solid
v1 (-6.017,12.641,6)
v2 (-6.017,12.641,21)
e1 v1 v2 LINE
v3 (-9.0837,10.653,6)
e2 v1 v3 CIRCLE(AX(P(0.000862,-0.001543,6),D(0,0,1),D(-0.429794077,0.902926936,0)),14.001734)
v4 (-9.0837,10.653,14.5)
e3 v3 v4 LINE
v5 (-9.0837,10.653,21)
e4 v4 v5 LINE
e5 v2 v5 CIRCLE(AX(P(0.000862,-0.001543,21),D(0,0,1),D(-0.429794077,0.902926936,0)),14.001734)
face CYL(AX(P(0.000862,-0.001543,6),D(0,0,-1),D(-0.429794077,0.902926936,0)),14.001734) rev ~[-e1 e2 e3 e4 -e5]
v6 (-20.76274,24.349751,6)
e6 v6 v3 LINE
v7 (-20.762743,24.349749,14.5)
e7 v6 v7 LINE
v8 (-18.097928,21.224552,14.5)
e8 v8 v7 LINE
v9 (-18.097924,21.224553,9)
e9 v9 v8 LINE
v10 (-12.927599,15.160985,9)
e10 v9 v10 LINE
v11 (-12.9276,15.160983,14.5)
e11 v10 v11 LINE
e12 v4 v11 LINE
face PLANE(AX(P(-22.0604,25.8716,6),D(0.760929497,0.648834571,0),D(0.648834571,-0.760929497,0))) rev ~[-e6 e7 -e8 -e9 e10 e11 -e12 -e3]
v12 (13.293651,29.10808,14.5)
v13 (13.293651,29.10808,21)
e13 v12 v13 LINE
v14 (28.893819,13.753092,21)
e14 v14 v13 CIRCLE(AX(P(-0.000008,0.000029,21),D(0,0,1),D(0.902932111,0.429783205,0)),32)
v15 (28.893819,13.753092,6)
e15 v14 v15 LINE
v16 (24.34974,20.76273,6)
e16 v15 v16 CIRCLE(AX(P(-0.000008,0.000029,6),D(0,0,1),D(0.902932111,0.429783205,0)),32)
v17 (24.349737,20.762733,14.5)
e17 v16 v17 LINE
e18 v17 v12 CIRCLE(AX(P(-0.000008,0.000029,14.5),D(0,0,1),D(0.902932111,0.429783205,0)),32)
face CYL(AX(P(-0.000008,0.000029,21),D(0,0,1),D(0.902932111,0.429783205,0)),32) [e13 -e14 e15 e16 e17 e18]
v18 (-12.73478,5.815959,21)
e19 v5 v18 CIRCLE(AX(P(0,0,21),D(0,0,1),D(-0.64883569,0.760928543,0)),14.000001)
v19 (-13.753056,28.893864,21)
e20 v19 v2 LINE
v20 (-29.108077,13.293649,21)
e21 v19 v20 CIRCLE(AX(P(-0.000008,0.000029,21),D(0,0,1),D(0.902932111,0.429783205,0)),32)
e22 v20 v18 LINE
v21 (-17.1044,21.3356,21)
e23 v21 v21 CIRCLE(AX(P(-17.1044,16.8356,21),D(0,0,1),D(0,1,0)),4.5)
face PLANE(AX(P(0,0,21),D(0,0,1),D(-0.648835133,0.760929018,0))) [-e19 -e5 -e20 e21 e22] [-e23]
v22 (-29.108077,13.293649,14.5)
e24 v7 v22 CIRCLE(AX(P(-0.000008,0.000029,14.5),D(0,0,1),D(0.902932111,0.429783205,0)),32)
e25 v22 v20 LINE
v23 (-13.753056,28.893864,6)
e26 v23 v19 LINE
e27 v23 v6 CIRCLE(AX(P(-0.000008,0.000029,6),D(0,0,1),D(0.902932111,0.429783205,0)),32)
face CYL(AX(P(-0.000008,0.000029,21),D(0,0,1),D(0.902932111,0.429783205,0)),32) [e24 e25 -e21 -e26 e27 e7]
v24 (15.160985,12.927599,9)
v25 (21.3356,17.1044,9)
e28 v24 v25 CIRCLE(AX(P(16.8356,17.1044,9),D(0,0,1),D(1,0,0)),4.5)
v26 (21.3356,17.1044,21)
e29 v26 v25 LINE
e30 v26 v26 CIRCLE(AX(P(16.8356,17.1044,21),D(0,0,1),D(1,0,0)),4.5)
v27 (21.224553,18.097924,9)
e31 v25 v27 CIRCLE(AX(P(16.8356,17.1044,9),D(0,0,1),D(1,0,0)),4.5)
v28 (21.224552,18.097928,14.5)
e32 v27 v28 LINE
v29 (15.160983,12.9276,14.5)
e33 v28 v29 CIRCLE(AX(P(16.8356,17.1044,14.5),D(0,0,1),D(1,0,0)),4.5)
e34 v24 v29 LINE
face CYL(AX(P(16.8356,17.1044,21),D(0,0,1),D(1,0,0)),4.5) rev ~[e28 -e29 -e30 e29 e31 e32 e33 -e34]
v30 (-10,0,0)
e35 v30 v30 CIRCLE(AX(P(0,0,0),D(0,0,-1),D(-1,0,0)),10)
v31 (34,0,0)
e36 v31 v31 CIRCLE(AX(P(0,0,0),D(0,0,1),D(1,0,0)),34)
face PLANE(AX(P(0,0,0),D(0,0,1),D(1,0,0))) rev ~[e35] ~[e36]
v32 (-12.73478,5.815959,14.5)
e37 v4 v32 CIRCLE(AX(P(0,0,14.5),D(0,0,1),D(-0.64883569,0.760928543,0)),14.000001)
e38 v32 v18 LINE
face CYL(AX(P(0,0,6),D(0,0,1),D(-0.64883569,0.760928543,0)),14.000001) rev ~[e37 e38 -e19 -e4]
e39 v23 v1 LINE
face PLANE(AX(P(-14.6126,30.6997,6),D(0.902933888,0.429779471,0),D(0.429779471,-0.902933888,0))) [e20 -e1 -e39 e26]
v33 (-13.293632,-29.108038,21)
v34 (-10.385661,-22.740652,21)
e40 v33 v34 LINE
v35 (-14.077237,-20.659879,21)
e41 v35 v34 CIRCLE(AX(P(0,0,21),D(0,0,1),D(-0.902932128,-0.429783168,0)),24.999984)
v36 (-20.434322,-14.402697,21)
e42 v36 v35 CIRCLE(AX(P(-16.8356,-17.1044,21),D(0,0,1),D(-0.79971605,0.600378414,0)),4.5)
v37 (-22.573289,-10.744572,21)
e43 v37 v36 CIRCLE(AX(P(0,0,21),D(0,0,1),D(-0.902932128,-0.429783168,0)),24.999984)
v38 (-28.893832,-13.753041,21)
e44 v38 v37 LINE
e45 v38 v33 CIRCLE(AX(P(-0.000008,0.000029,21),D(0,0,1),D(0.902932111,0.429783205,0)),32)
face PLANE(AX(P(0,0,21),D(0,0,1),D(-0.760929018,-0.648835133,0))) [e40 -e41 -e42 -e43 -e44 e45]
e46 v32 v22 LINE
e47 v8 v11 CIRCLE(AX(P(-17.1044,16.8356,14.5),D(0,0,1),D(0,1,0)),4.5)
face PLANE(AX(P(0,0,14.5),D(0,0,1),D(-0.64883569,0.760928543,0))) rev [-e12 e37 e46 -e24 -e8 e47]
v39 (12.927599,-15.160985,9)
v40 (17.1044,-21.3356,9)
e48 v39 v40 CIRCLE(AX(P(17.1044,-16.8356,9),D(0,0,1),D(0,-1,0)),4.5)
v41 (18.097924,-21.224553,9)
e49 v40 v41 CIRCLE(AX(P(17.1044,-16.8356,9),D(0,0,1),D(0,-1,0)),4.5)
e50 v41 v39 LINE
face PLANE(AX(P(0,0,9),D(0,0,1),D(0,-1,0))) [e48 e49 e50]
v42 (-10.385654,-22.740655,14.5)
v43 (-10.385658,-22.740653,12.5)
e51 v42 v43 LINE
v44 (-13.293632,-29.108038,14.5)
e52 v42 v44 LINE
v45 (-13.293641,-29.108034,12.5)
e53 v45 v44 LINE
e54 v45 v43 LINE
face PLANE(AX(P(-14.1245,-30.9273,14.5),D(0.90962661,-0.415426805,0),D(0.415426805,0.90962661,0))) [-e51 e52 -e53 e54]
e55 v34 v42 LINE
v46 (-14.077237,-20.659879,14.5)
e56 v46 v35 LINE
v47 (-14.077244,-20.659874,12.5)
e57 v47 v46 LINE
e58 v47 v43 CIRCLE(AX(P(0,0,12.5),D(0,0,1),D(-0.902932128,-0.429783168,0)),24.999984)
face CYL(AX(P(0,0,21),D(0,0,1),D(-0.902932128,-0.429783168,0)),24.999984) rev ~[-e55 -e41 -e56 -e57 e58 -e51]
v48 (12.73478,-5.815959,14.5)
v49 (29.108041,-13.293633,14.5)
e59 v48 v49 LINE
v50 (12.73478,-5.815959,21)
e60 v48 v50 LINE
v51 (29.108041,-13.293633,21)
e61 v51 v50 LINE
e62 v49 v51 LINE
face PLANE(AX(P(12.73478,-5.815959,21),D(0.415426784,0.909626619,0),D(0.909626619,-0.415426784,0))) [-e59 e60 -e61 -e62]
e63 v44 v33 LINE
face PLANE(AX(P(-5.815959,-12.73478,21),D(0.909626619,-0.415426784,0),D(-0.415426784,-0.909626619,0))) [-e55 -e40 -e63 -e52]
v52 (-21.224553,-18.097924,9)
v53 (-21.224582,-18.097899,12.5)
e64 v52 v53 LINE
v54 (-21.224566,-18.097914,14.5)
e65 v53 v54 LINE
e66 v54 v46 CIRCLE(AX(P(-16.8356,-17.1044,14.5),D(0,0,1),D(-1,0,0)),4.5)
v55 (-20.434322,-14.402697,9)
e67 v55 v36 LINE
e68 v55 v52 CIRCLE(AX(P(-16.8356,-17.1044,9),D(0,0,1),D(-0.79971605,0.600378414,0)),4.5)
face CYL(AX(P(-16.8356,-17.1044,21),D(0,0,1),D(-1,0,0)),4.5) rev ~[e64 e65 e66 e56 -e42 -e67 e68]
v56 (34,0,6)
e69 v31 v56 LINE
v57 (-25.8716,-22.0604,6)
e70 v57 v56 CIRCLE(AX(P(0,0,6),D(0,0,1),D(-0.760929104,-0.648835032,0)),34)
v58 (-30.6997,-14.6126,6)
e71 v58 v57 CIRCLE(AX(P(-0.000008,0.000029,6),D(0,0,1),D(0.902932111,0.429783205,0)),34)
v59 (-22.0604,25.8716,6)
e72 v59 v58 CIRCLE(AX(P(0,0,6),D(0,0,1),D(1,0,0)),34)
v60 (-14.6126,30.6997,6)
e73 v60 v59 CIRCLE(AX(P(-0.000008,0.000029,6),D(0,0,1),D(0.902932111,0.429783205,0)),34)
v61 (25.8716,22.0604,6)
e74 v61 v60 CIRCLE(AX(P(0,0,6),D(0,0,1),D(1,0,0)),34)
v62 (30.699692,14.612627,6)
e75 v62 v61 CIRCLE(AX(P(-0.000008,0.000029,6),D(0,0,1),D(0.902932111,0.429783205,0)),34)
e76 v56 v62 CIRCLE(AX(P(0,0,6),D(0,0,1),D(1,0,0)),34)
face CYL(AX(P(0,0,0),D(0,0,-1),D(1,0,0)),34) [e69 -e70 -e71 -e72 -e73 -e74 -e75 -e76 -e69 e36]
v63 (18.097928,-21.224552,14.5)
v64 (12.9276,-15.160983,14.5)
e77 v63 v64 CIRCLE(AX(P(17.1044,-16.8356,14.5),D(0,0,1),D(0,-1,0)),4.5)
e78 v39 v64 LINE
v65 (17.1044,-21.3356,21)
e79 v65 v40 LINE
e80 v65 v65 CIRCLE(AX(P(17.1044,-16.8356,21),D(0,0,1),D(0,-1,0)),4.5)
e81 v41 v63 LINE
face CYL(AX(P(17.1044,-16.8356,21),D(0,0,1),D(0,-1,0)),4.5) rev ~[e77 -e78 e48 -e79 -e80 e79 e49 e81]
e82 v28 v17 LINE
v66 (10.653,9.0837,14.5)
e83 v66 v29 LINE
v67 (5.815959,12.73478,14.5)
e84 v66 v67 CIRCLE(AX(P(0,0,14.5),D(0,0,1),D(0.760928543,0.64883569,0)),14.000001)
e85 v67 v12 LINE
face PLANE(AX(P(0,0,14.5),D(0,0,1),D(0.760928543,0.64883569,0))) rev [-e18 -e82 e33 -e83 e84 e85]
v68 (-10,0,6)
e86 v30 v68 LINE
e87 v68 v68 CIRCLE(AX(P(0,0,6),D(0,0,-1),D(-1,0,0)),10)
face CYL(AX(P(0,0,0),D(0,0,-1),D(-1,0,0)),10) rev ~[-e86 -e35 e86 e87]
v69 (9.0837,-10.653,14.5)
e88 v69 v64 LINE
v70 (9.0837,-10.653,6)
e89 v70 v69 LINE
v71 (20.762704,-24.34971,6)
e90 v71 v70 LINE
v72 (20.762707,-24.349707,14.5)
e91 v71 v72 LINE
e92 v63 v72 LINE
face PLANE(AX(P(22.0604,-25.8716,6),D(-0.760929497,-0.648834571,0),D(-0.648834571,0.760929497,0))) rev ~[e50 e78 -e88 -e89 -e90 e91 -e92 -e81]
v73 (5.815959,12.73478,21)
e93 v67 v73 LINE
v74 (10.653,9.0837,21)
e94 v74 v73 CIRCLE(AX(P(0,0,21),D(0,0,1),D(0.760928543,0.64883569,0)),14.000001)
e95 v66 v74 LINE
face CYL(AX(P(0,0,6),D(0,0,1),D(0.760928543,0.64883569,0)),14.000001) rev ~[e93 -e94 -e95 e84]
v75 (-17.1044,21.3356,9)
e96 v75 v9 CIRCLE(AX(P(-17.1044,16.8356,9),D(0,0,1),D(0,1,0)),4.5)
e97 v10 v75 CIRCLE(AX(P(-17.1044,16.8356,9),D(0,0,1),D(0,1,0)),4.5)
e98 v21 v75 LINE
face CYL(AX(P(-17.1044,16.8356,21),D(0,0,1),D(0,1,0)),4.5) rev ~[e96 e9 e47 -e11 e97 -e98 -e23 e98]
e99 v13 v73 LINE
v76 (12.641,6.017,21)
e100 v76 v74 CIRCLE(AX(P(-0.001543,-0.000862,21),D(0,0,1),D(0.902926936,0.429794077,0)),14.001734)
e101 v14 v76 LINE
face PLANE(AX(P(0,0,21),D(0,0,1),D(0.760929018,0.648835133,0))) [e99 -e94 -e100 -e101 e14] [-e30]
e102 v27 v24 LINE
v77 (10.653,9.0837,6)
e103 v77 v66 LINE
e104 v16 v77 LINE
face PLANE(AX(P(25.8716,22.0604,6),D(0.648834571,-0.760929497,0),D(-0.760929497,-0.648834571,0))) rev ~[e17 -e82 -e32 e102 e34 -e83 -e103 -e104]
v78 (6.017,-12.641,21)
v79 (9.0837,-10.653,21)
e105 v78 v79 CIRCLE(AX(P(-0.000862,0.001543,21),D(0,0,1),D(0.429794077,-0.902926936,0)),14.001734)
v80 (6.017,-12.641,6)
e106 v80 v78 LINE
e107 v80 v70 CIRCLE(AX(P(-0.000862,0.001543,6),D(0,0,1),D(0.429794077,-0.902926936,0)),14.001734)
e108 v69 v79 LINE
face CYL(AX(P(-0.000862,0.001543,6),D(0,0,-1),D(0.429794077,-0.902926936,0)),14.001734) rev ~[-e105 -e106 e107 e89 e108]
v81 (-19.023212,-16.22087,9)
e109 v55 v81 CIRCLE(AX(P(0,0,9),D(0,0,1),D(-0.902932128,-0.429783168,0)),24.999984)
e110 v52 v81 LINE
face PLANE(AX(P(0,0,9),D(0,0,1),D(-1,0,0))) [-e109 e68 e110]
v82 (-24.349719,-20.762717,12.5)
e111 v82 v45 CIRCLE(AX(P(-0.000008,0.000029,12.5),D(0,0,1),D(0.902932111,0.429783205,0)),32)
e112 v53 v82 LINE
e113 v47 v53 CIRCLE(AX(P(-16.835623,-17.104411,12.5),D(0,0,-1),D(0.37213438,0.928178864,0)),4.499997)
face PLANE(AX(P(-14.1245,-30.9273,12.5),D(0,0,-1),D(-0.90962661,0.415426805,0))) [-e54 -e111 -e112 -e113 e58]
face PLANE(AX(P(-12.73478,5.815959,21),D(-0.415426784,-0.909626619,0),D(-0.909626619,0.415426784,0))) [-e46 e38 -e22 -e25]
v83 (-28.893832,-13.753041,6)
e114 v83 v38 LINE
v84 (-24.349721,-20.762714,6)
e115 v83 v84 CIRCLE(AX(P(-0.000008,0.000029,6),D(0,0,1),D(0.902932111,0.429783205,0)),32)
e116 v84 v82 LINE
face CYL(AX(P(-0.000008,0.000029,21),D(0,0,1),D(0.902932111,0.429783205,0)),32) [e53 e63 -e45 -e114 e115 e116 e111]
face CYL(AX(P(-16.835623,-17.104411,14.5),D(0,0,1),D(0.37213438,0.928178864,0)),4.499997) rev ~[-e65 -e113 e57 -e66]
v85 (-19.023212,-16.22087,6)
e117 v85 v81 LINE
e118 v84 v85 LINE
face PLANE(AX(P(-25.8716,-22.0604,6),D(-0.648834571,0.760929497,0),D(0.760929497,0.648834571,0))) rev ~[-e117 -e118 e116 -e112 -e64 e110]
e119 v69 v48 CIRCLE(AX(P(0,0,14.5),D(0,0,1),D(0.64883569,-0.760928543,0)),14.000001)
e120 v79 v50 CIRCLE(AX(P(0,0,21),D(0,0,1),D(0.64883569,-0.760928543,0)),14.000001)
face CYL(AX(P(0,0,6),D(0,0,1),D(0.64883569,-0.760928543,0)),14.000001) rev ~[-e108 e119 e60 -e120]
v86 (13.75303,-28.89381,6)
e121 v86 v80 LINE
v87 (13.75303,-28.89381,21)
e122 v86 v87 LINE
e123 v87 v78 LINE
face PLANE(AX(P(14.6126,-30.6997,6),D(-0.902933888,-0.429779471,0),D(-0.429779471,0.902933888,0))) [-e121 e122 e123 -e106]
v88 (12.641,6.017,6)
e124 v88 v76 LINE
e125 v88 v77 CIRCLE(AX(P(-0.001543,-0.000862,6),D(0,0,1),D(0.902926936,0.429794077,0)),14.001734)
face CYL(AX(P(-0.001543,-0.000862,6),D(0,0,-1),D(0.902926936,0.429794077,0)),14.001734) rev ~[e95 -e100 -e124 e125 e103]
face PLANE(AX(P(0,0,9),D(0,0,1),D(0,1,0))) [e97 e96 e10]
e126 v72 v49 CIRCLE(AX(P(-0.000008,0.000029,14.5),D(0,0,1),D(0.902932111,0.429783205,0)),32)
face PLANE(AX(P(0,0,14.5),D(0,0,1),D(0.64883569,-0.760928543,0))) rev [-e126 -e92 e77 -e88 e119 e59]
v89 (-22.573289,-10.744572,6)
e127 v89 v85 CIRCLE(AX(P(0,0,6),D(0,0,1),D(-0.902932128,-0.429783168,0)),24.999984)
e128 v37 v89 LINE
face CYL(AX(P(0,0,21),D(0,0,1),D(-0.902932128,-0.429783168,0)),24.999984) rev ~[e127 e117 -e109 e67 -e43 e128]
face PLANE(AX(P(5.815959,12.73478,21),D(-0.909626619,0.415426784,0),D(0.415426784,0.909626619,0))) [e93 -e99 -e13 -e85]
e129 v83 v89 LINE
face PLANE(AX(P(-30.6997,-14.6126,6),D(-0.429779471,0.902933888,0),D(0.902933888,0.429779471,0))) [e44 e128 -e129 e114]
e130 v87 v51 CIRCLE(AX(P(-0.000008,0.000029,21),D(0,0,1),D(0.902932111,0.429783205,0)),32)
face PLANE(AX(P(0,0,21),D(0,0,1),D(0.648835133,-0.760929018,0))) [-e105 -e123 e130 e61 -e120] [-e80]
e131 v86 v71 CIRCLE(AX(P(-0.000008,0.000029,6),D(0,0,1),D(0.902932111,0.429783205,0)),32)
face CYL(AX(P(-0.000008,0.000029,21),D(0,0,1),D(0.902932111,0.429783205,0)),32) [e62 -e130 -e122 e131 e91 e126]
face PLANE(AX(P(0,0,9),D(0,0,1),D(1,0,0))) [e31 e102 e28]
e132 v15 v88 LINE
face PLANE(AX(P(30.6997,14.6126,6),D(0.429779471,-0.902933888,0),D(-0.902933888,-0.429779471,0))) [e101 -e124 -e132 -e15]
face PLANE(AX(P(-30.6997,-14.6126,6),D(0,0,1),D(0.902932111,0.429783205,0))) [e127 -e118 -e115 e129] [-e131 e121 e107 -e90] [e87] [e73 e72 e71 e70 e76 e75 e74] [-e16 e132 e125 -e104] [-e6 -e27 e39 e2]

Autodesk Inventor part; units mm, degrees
ref_plane "YZ Plane" through (0, 0, 0) normal (1, 0, 0) x (0, 1, 0)
ref_plane "XZ Plane" through (0, 0, 0) normal (0, 1, 0) x (-1, 0, 0)
ref_plane "XY Plane" through (0, 0, 0) normal (0, 0, 1) x (1, 0, 0)
sketch "Sketch1" plane through (0, 0, 0) normal (0, 0, 1) x (1, 0, 0)
  circle A0 centre (0, 0) radius 34
  dimension "d0" = 68
extrude "Extrusion1" add sketch "Sketch1" along normal blind 6
sketch "Sketch2" plane through (0, 0, 6) normal (0, 0, 1) x (1, 0, 0)
  circle A0 centre (0, 0) radius 34
  circle A1 centre (0, 0) radius 34 projected
  line L0 (0, 0) -> (30.6997, 14.6126) construction
  line L1 (0, 0) -> (25.8716, 22.0604) construction
  line L2 (25.8716, 22.0604) -> (10.653, 9.0837)
  line L3 (30.6997, 14.6126) -> (12.641, 6.017)
  arc A2 (30.6997, 14.6126) -> (25.8716, 22.0604) centre (0, 0) ccw
  arc A3 (12.641, 6.017) -> (10.653, 9.0837) centre (0, 0) ccw
  dimension "d3" = 15
  dimension "d4" = 20
extrude "Extrusion2" add sketch "Sketch2" along normal blind 15 contours L3 A3 L2 A0 picked at (22.8031, 15.025)
sketch "Sketch3" plane through (10.653, 9.0837, 21) normal (-0.6488347, 0.7609293, 0) x (0.7609293, 0.6488347, 0)
  line L0 (0, 15) -> (0, 0) projected
  line L1 (20, 0) -> (0, 0)
  line L2 (0, 0) -> (0, 6.5)
  line L3 (0, 6.5) -> (20, 6.5)
  line L4 (20, 6.5) -> (20, 0)
  line L5 (-14, 25.2) -> (-14, -4.2) projected
  line L6 (-48, 15) -> (20, 15) projected
  point P0 (-14, 21)
  point P1 (18.8415, 15)
  dimension "d7" = 6.5
  dimension "d26" = 8.5
revolve "Revolution1" add sketch "Sketch3" angle 25 about axis through (0, 0, 6) along (0, 0, 1)
sketch "Sketch4" plane through (0, 0, 21) normal (0, 0, 1) x (1, 0, 0)
  circle A0 centre (16.8356, 17.1044) radius 4.5
  arc A1 (12.641, 6.017) -> (5.816, 12.7348) centre (0, 0) ccw projected
  arc A2 (30.6997, 14.6126) -> (14.1245, 30.9273) centre (0, 0) ccw projected
  line L0 (12.641, 6.017) -> (30.6997, 14.6126) projected
  line L1 (5.816, 12.7348) -> (14.1245, 30.9273) projected
  arc A3 (21.6704, 10.3148) -> (9.9702, 21.831) centre (0, 0) ccw construction
  circle A4 centre (0, 0) radius 34 construction
  line L2 (23.8505, 24.2313) -> (19.6046, 19.9177) construction
  dimension "d12" = 9
extrude "Extrusion3" cut sketch "Sketch4" against normal blind 12 contours A0
pattern_circular "Circular Pattern2" count 4 over 360 about axis through (0, 0, 6) along (0, 0, 1) of "Revolution1", "Extrusion3", "Extrusion2"
sketch "Sketch5" plane through (0, 0, 0) normal (0, 0, -1) x (-1, 0, 0)
  circle A0 centre (0, 0) radius 10
  dimension "d23" = 20
extrude "Extrusion4" cut sketch "Sketch5" against normal blind 10
sketch "Sketch6" plane through (-14.1245, -30.9273, 14.5) normal (0, 0, -1) x (-0.9096266, 0.4154268, 0)
  line L0 (11.7881, 8.7204) -> (14.369, 3.1855) projected
  line L1 (0, 0) -> (0, 20)
  arc A0 (0, 0) -> (14.369, 3.1855) centre (0, 34) ccw
  arc A1 (0, 20) -> (5.9167, 21.3117) centre (0, 34) ccw projected
  arc A2 (0, 20) -> (5.9167, 21.3117) centre (0, 34) ccw
  arc A3 (0, 0) -> (14.369, 3.1855) centre (0, 34) ccw projected
  arc A4 (8.4204, 15.9424) -> (11.7881, 8.7204) centre (8.2085, 11.4474) ccw
  arc A5 (8.4204, 15.9424) -> (11.7881, 8.7204) centre (8.2085, 11.4474) ccw projected
  line L2 (14.369, 3.1855) -> (11.7881, 8.7204)
  line L3 (8.4204, 15.9424) -> (5.9167, 21.3117)
  point P0 (0, 34)
extrude "Extrusion5" add sketch "Sketch6" along normal blind 2
sketch "Sketch7" plane through (0, 0, 21) normal (0, 0, 1) x (0.7126851, -0.7014841, 0)
  line L0 (11.6287, -31.9495) -> (9.1517, -25.1441)
  line L1 (4.7883, -13.1557) -> (11.6287, -31.9495) projected
  line L2 (12.9105, -23.776) -> (15.3067, -30.3596)
  arc A0 (11.6287, -31.9495) -> (15.3067, -30.3596) centre (0, 0) ccw
  line L3 (12.9105, -23.776) -> (9.1517, -25.1441)
  arc A1 (-11.6287, -31.9495) -> (11.6287, -31.9495) centre (0, 0) ccw projected
  dimension "d29" = 4
extrude "Extrusion6" [suppressed]
sketch "Sketch8" plane through (-30.6997, -14.6126, 21) normal (0, 0, 1) x (0.9029321, 0.4297832, 0)
  circle A0 centre (34, 0) radius 34 projected
  circle A1 centre (34, 0) radius 34
  circle A2 centre (34, 0) radius 10 projected
  circle A3 centre (34, 0) radius 32
  dimension "d32" = 2
extrude "Extrusion7" cut sketch "Sketch8" against normal up to surface (15 mm away) contours A0
sketch "Sketch9" plane through (0, 0, 21) normal (0, 0, 1) x (0.7126851, -0.7014841, 0)
  point P0 (0, 0)
sketch "Sketch10" plane through (0, 0, 21) normal (0, 0, 1) x (0.7126851, -0.7014841, 0)
  line L0 (4.7883, -13.1557) -> (10.9208, -30.0046)
  line L1 (4.7883, -13.1557) -> (10.9446, -30.0702) projected
  line L2 (-4.7883, -13.1557) -> (-10.9446, -30.0702)
  line L3 (-4.7883, -13.1557) -> (-10.9446, -30.0702) projected
  arc A0 (-10.9446, -30.0702) -> (10.9446, -30.0702) centre (0, 0) ccw projected
  line L4 (7.8665, -21.6129) -> (10.9208, -30.0046)
  arc A1 (-8.5505, -23.4923) -> (8.5505, -23.4923) centre (0, 0) ccw
  line L5 (4.7883, -13.1557) -> (-4.7883, -13.1557)
  line L6 (10.9208, -30.0046) -> (15.734, -30.5587)
  line L7 (15.734, -30.5587) -> (12.8246, -22.565)
  line L8 (12.8246, -22.565) -> (9.1517, -25.1441)
  point P0 (0, 0)
  point P1 (14.6176, -28.4662)
  dimension "d36" = 7
extrude "Extrusion8" cut sketch "Sketch10" against normal up to surface (15 mm away) contours L0 A1 L2 L5
sketch "Sketch11" plane through (-11.1159, -24.3396, 21) normal (0, 0, 1) x (0.9096266, -0.4154268, 0)
  arc A0 (-20.5692, 2.2443) -> (4, -4.9913) centre (0, 26.7578) ccw projected
  point P0 (0, 26.7578)
properties part number "new male 4 bay con"
